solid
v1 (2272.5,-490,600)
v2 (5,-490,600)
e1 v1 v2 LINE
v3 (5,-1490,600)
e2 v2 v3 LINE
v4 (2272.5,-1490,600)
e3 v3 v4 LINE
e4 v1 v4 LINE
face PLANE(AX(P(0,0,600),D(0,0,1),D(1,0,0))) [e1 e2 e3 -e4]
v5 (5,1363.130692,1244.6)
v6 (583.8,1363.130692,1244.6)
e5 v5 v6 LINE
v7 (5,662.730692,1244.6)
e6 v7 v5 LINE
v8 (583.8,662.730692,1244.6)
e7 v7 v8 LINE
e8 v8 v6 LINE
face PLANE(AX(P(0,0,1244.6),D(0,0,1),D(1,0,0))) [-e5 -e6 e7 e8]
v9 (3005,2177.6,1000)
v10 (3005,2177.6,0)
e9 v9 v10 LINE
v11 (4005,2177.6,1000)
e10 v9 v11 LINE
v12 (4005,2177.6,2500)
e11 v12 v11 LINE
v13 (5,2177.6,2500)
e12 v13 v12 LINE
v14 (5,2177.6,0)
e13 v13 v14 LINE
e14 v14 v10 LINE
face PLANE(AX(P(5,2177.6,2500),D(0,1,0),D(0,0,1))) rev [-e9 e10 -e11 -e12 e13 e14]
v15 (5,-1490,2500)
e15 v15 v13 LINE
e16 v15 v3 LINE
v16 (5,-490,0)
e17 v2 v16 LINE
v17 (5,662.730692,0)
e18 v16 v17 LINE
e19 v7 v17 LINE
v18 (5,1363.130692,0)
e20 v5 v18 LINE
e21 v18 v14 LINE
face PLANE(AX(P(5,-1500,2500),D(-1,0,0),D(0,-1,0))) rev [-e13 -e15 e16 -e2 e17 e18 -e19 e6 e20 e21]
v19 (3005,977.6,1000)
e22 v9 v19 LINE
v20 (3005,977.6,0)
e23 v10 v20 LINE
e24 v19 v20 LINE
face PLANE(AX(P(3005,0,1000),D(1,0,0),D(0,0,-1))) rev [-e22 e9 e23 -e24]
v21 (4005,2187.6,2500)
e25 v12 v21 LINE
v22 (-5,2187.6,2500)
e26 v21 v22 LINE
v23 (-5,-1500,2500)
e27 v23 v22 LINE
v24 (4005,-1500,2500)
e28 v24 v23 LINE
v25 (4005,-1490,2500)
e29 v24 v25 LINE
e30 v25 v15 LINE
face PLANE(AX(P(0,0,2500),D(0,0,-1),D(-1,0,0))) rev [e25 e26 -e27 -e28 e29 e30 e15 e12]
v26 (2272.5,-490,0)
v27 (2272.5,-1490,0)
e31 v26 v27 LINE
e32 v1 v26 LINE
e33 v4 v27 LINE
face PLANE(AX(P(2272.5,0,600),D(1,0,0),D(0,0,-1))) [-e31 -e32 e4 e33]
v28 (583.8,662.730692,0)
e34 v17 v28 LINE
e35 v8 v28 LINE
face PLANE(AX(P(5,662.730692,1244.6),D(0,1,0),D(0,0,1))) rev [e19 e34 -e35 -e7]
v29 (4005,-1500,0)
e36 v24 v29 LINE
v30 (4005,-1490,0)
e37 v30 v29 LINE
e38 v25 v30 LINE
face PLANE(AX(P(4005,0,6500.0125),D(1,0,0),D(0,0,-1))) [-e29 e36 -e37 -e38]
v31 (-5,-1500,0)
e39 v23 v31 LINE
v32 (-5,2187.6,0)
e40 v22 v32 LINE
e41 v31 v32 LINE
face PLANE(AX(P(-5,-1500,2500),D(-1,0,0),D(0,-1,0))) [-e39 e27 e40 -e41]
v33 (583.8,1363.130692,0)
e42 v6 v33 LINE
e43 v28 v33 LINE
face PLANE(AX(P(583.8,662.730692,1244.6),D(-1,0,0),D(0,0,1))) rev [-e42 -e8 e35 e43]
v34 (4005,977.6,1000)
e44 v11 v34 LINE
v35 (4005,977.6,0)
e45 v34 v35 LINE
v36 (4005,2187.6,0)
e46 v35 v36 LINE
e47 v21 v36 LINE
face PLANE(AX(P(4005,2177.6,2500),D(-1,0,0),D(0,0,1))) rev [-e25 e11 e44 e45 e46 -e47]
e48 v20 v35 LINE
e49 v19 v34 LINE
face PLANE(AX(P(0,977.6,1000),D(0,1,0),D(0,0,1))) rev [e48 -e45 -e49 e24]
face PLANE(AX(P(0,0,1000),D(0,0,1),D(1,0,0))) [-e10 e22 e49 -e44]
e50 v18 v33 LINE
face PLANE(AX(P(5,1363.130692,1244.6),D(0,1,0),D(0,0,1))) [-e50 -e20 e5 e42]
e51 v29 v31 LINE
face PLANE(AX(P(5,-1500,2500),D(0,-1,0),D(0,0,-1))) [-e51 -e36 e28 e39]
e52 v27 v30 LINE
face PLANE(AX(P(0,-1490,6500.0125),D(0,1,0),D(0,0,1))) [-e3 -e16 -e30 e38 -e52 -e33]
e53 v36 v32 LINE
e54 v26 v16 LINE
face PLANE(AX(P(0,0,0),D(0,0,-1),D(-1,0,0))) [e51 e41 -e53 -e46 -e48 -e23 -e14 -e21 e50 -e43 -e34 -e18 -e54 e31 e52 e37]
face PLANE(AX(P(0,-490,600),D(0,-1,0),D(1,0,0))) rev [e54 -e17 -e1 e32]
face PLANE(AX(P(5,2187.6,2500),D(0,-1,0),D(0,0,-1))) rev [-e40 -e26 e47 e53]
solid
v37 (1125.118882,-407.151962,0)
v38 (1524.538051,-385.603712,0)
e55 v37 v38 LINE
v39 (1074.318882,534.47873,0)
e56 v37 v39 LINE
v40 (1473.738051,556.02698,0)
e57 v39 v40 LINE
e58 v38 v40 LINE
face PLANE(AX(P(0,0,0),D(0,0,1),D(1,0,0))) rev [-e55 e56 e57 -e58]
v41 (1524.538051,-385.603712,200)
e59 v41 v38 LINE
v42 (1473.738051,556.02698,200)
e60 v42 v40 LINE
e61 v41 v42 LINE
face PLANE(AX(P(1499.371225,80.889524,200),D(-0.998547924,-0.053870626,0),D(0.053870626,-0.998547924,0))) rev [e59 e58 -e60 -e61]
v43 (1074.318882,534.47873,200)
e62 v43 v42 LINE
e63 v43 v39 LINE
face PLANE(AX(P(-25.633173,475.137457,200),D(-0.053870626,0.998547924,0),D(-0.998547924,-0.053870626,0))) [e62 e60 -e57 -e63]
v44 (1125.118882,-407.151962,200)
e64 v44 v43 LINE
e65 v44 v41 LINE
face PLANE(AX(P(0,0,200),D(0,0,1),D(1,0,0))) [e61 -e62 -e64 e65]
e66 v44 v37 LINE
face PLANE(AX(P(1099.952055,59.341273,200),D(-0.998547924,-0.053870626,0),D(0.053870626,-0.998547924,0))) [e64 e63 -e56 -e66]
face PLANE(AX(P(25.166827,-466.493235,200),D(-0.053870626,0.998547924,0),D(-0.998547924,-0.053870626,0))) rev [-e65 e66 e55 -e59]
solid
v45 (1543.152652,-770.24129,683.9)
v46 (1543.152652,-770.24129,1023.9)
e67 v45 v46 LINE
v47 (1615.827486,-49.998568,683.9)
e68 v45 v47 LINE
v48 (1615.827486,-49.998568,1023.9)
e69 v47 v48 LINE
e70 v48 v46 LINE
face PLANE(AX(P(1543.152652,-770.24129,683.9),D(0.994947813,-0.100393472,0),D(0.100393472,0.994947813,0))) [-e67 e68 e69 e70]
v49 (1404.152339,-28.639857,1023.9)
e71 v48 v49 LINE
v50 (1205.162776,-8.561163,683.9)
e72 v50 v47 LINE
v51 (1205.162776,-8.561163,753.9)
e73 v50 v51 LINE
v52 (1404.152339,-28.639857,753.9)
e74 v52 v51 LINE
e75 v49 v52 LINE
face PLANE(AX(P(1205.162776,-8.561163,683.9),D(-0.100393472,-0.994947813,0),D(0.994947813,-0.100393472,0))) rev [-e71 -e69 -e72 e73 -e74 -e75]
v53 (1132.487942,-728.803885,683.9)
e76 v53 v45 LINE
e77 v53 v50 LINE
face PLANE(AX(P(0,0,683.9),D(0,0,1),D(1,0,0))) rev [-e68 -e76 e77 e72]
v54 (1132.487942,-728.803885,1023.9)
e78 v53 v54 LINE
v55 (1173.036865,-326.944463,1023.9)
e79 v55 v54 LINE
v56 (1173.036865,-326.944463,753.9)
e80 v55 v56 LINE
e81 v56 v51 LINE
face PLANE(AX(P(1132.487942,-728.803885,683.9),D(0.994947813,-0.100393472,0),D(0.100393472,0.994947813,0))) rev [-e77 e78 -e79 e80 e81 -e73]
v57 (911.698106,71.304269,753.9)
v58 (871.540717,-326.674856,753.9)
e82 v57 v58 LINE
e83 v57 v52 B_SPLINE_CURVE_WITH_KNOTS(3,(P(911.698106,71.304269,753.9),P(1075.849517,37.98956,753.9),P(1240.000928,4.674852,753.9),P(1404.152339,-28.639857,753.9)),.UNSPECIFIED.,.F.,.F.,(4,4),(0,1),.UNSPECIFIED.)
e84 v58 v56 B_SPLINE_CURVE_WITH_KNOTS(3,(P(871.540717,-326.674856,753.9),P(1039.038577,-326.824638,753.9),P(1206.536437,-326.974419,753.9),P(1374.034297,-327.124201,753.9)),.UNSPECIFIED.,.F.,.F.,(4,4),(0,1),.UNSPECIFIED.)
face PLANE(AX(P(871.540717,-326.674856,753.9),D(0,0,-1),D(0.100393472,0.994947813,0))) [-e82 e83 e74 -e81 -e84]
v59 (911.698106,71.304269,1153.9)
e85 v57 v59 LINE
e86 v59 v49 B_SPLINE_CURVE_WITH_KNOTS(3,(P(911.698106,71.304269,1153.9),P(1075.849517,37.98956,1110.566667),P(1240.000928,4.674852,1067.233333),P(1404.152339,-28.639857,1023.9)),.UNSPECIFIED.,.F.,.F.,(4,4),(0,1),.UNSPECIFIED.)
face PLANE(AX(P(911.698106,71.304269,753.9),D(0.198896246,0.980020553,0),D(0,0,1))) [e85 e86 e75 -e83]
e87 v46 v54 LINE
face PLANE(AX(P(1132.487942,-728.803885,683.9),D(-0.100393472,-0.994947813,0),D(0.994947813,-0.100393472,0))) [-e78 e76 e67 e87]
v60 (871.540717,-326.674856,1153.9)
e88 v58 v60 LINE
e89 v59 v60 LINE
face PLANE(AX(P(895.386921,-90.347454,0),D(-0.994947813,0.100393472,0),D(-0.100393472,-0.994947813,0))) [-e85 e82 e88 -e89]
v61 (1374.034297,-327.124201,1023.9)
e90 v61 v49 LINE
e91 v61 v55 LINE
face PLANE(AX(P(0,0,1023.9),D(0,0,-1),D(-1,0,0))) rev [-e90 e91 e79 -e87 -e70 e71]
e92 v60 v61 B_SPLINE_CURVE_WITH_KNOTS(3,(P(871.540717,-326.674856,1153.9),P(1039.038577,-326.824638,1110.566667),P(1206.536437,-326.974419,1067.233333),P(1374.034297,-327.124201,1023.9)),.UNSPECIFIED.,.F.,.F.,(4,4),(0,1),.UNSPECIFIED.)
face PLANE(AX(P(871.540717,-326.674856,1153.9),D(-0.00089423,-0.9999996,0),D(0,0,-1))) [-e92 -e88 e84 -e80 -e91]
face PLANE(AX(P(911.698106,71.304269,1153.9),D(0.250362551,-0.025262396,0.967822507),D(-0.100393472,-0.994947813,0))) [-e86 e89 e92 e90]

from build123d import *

# Parameters (mm, degrees)
SKETCH1_W            = 10
SKETCH1_H            = 3687.6
BOSS_EXTRUDE1_DEPTH  = 2500
BOSS_EXTRUDE2_DEPTH  = 2500
SKETCH3_3_W          = 2267.5
SKETCH3_3_H          = 1000
BOSS_EXTRUDE3_DEPTH  = 600
SKETCH3_4_W          = 558.8
SKETCH3_4_H          = 660.4
SKETCH3_4_W_2        = 578.8
SKETCH3_4_H_2        = 700.4
BOSS_EXTRUDE4_DEPTH  = 1244.6
BOSS_EXTRUDE5_DEPTH  = 200
SKETCH3_7_W          = 4000
SKETCH3_7_H          = 10
BOSS_EXTRUDE7_DEPTH  = 2500
SKETCH3_8_W          = 1000
SKETCH3_8_H          = 1200
BOSS_EXTRUDE8_DEPTH  = 1000
BOSS_EXTRUDE9_START  = 723.9
BOSS_EXTRUDE9_DEPTH  = 40
BOSS_EXTRUDE11_START = 723.9
BOSS_EXTRUDE11_DEPTH = 30
BOSS_EXTRUDE13_START = 723.9
BOSS_EXTRUDE13_DEPTH = 300
LOFT1_START          = 753.9
LOFT1_DEPTH          = 400
LOFT1_START_2        = 1343.22413698
LOFT1_2_DEPTH        = 126.77586302


with BuildPart() as part:
    # Sketch1 → Boss-Extrude1 (new body)
    with BuildSketch(Plane.XY):
        with Locations((0, 343.8)):
            Rectangle(SKETCH1_W, SKETCH1_H)
    extrude(amount=BOSS_EXTRUDE1_DEPTH)

    # Sketch3 → Boss-Extrude2 (add)
    with BuildSketch(Plane.XY):
        Polygon((3072.5, -1490), (2272.5, -1490), (5, -1490), (5, -1500), (4005, -1500), (4005, -1490), align=None)
    extrude(amount=BOSS_EXTRUDE2_DEPTH)

    # Sketch3<3> → Boss-Extrude3 (add)
    with BuildSketch(Plane.XY):
        with Locations((1138.75, -990)):
            Rectangle(SKETCH3_3_W, SKETCH3_3_H)
    extrude(amount=BOSS_EXTRUDE3_DEPTH)

    # Sketch3<4> → Boss-Extrude4 (add)
    with BuildSketch(Plane.XY):
        with Locations((284.4, 1012.930691938)):
            Rectangle(SKETCH3_4_W, SKETCH3_4_H)
        with Locations((294.4, 1012.930691938)):
            Rectangle(SKETCH3_4_W_2, SKETCH3_4_H_2)
    extrude(amount=BOSS_EXTRUDE4_DEPTH)

    # Sketch3<7> → Boss-Extrude7 (add)
    with BuildSketch(Plane.XY):
        with Locations((2005, 2182.6)):
            Rectangle(SKETCH3_7_W, SKETCH3_7_H)
    extrude(amount=BOSS_EXTRUDE7_DEPTH)

    # Sketch3<8> → Boss-Extrude8 (add)
    with BuildSketch(Plane.XY):
        with Locations((3505, 1577.6)):
            Rectangle(SKETCH3_8_W, SKETCH3_8_H)
    extrude(amount=BOSS_EXTRUDE8_DEPTH)


with BuildPart() as body_2:
    # Sketch3<5> → Boss-Extrude5 (new body)
    with BuildSketch(Plane.XY):
        Polygon((1125.118882054, -407.151961824), (1524.538051487, -385.603711559), (1473.738051487, 556.026980379), (1074.318882054, 534.478730114), align=None)
    extrude(amount=BOSS_EXTRUDE5_DEPTH)


with BuildPart() as body_3:
    # Sketch3<9> → Boss-Extrude9 (new body)
    with BuildSketch(Plane.XY.offset(BOSS_EXTRUDE9_START)):
        Polygon((1132.487942059, -728.803884792), (1205.162776182, -8.561162867), (1615.827486051, -49.998568288), (1543.152651928, -770.241290213), align=None)
    extrude(amount=-BOSS_EXTRUDE9_DEPTH)



with BuildPart() as body_4:
    # Sketch3<10> → Boss-Extrude11 (new body)
    with BuildSketch(Plane.XY.offset(BOSS_EXTRUDE11_START)):
        Polygon((1205.162776182, -8.561162867), (1175.044734689, -307.045506806), (1374.034297315, -327.124201135), (1404.152338808, -28.639857196), align=None)
    extrude(amount=BOSS_EXTRUDE11_DEPTH)


with BuildPart() as body_3_1:
    add(body_3.part)

    add(body_4.part)  # Boss-Extrude13 merges body 4
    # Sketch3<11> → Boss-Extrude13 (add)
    with BuildSketch(Plane.XY.offset(BOSS_EXTRUDE13_START)):
        Polygon((1132.487942059, -728.803884792), (1543.152651928, -770.241290213), (1615.827486051, -49.998568288), (1404.152338808, -28.639857196), (1374.034297315, -327.124201135), (1175.044734689, -307.045506806), align=None)
    extrude(amount=BOSS_EXTRUDE13_DEPTH)

    # Loft1: read off the stored shape, not the designer's step
    # Loft1 outline → Loft1 (add)
    with BuildSketch(Plane.XY.offset(LOFT1_START)):
        Polygon((911.698105825, 71.304269282), (871.540717168, -326.67485597), (1374.034297315, -327.124201135), (1404.152338808, -28.639857196), align=None)
    extrude(amount=LOFT1_DEPTH)

    # Loft1 2 outline → Loft1 2 (cut)
    with BuildSketch(Plane(origin=(0, 0, 0), x_dir=(0.9681521540004261, 0.006532813937532859, -0.25027730429743866), z_dir=(0.25036255052290696, -0.025262395961762493, 0.9678225067882728)).offset(LOFT1_START_2)):
        with BuildLine():
            add(Edge.make_bspline(
                [(594.333321048, 101.389182409), (763.884574243, 66.955102294), (933.435827438, 32.52102218), (1102.987080633, -1.913057935)],
                knots=[0, 0, 0, 0, 1, 1, 1, 1], degree=3))
            Line((594.333321048, 101.389182409), (552.854935144, -296.454434484))
            add(Edge.make_bspline(
                [(552.854935144, -296.454434484), (725.862720498, -297.734879858), (898.870505851, -299.015325231), (1071.878291205, -300.295770605)],
                knots=[0, 0, 0, 0, 1, 1, 1, 1], degree=3))
            Line((1071.878291205, -300.295770605), (1102.987080633, -1.913057935))
        make_face()
    extrude(amount=LOFT1_2_DEPTH, mode=Mode.SUBTRACT)


solid = Compound([part.part, body_2.part, body_3_1.part])
